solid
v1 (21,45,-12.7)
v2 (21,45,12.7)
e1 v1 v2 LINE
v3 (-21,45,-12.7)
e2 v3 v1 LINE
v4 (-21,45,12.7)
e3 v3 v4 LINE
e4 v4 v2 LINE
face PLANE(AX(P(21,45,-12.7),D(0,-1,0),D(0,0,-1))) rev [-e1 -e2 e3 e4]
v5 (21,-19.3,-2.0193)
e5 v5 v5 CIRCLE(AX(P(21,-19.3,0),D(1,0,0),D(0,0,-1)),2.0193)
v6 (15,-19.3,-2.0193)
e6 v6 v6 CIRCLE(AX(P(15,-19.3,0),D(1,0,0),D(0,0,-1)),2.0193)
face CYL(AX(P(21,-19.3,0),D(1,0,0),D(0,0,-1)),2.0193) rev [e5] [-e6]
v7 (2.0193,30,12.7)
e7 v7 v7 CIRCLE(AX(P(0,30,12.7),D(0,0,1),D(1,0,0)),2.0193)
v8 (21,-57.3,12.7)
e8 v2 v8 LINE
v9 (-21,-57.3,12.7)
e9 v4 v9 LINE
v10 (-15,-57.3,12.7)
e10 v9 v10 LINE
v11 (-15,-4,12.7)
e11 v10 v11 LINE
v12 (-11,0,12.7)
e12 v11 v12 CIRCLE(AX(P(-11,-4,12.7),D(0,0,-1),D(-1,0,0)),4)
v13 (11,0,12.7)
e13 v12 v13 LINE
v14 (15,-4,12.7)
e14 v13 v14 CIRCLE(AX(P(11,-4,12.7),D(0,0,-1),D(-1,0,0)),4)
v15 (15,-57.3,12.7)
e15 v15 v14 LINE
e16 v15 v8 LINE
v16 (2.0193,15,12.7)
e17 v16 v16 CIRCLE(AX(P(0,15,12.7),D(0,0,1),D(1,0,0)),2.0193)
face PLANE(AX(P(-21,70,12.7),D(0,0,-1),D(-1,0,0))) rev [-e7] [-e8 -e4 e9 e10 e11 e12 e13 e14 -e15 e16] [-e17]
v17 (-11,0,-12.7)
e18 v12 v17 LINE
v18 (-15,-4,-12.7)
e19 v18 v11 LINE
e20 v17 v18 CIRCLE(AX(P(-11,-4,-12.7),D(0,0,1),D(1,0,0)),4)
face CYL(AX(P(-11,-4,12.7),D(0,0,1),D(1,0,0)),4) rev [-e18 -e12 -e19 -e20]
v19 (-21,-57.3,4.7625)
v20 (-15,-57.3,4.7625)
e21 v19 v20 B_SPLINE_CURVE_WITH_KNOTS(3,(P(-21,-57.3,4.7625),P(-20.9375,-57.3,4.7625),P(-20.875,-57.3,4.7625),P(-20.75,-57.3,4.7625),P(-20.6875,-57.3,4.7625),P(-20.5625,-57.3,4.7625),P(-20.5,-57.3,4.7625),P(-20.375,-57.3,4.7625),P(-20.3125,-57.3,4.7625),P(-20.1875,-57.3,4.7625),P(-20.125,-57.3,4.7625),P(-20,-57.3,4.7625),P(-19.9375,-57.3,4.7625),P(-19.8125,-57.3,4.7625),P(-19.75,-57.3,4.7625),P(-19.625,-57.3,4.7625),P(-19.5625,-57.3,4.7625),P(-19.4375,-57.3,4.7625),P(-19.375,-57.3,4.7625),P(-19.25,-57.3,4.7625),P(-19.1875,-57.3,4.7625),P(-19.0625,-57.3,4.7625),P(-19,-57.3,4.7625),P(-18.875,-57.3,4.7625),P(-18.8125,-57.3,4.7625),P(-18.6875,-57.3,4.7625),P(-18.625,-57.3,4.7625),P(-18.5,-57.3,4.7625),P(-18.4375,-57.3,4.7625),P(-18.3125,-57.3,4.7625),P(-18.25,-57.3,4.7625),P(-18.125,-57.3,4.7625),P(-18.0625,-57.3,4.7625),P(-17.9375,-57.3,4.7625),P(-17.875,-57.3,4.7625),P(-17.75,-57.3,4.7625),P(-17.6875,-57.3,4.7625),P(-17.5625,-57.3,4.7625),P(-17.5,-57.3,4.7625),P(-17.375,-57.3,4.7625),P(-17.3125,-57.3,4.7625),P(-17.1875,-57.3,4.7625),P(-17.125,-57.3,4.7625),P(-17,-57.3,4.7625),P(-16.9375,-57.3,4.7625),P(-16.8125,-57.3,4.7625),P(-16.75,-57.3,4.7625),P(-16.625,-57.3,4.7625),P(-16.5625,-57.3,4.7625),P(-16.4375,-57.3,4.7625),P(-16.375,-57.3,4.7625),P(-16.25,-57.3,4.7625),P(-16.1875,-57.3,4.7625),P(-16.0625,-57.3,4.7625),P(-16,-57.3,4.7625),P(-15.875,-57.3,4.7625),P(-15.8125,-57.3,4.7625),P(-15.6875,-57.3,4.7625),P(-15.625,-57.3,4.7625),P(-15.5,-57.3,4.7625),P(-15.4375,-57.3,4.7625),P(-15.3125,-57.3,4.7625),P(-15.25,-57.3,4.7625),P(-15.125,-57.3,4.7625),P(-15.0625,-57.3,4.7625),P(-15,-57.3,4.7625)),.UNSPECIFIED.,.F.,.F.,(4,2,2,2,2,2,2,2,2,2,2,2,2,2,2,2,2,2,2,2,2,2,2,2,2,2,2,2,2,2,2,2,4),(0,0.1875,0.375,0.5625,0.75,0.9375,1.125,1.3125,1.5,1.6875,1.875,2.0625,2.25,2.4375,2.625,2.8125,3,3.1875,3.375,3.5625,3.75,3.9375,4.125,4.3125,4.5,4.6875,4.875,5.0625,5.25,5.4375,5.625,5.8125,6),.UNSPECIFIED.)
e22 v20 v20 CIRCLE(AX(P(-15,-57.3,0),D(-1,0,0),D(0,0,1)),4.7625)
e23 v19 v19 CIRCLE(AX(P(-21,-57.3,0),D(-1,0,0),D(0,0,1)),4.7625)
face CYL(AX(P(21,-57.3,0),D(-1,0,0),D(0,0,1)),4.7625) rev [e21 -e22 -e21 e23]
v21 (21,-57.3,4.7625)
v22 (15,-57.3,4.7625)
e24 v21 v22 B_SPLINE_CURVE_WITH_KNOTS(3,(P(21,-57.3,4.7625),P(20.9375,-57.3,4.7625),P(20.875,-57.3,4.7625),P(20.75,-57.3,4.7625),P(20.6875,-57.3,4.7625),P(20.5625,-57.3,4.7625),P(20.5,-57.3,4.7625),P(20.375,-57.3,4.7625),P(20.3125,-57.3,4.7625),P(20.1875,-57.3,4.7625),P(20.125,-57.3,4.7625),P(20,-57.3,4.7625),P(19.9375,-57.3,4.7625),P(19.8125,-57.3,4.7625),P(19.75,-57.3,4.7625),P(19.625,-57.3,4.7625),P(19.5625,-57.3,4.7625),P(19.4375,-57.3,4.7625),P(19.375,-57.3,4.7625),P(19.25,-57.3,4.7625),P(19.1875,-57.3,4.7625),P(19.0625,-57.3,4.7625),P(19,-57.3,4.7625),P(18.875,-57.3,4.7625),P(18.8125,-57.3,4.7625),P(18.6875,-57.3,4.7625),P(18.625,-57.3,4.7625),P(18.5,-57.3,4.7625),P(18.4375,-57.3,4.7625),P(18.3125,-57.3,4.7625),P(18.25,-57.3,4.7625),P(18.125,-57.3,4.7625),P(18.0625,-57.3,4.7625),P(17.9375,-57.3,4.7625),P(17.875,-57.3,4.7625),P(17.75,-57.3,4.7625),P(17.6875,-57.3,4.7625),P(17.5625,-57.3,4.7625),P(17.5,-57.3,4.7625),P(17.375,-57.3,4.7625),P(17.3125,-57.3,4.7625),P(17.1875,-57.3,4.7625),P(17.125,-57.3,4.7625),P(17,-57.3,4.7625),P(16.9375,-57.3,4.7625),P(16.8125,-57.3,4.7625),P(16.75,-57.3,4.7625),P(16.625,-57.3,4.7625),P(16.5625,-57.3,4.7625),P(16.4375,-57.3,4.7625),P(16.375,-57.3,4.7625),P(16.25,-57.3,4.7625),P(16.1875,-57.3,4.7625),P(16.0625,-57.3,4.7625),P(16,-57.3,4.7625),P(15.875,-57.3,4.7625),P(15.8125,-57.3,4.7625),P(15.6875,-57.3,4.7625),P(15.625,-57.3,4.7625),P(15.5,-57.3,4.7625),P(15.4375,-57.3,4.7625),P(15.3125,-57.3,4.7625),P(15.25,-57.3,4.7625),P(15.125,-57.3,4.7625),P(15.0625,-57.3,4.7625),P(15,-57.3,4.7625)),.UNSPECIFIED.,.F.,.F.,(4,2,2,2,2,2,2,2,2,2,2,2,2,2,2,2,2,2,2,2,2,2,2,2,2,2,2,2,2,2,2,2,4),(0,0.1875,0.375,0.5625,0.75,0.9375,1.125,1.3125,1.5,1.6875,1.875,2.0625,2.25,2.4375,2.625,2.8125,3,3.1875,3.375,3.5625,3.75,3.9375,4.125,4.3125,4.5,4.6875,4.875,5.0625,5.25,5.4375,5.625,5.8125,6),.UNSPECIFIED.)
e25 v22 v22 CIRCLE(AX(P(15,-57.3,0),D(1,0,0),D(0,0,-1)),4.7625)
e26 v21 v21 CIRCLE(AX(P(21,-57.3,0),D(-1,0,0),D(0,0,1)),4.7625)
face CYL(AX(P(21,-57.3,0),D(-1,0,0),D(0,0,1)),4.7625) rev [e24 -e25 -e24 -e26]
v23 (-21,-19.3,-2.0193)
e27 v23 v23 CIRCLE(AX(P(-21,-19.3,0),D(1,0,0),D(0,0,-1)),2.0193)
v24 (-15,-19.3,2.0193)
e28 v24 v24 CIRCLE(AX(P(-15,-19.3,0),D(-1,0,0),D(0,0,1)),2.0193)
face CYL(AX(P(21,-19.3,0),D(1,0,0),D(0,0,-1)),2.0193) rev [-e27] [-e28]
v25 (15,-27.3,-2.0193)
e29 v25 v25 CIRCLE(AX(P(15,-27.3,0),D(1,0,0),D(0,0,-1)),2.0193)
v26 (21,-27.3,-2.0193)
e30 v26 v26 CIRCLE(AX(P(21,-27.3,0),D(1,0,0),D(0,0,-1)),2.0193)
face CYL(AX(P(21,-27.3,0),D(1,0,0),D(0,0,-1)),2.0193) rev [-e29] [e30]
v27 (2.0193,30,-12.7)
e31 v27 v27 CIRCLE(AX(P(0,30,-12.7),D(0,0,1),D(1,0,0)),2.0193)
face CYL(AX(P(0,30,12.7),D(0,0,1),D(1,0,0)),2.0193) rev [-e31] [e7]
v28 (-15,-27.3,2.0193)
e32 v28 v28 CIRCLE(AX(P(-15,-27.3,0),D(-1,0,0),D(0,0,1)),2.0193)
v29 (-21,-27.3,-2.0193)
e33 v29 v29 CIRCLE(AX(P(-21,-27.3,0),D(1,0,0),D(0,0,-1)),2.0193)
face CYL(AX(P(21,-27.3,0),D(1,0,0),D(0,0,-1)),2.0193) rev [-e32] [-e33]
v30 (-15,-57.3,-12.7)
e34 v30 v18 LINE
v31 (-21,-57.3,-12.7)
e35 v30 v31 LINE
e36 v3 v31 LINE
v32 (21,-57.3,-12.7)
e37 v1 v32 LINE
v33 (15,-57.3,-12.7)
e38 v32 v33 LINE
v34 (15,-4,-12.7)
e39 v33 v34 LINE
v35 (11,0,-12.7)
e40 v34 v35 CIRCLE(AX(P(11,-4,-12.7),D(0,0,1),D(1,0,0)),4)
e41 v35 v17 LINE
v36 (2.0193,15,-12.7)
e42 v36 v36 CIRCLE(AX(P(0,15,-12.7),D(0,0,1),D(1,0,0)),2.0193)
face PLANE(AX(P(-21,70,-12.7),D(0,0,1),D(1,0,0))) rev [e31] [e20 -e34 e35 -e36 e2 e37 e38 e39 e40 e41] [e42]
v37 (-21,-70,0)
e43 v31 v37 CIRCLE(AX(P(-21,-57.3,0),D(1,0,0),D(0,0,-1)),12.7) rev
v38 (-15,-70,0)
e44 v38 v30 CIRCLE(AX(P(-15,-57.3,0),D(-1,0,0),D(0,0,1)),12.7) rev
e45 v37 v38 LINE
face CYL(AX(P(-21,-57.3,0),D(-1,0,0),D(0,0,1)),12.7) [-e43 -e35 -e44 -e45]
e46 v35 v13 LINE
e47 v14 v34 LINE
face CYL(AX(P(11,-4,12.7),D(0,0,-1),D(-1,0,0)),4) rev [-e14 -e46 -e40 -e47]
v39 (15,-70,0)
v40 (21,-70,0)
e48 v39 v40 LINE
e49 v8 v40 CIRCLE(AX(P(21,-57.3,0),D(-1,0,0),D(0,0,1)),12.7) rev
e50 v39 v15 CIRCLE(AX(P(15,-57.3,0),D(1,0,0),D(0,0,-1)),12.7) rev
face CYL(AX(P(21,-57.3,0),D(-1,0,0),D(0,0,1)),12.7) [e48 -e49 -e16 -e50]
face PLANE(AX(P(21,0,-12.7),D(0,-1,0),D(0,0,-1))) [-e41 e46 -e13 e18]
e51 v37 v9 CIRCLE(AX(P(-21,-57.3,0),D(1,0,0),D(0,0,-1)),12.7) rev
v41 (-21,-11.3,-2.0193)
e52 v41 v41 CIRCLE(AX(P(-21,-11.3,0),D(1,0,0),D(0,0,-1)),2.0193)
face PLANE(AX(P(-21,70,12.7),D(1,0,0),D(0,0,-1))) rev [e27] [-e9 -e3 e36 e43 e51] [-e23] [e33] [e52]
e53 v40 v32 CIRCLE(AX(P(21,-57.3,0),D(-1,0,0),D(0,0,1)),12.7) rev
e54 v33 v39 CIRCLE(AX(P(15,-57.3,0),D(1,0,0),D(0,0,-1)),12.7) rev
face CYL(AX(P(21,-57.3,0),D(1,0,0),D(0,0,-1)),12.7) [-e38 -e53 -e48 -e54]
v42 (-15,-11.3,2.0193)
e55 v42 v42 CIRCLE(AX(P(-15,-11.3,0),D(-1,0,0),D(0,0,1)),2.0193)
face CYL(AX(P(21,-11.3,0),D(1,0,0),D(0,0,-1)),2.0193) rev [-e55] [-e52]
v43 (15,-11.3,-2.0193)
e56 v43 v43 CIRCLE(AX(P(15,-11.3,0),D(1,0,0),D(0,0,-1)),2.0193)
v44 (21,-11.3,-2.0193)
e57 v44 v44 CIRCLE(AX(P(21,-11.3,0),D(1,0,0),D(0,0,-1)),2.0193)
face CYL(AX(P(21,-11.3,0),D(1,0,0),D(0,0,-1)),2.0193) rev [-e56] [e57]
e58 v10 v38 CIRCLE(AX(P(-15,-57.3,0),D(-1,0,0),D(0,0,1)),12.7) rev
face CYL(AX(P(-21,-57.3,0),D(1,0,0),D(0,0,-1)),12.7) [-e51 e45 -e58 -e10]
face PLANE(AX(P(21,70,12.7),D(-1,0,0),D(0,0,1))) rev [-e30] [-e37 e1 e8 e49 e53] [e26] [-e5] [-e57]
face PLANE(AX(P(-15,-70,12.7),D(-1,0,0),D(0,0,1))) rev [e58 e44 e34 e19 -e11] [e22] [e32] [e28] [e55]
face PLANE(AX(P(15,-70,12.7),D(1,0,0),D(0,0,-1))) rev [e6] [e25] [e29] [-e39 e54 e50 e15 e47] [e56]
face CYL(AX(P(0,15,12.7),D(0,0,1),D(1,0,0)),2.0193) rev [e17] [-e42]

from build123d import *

# Parameters (mm, degrees)
SKETCH_1_W            = 42
SKETCH_1_H            = 25.4
EXTRUDE_1_DEPTH       = 70
SKETCH_5_W            = 6
SKETCH_5_H            = 25.4
EXTRUDE_5_DEPTH       = 70
SKETCH_6_R            = 4.7625
CUT_EXTRUDE_2_DEPTH   = 83.61531335
FILLET_6_R            = 4
HOLE_WIZARD_10_32_1_D = 4.0386
FILLET_7_R            = 12.7
SKETCH_9_W            = 42
SKETCH_9_H            = 25
CUT_EXTRUDE_3_DEPTH   = 78.370278531
HOLE_WIZARD_10_32_2_D = 4.0386


with BuildPart() as part:
    # 草圖1 → 填料-伸長1 (new body)
    with BuildSketch(Plane(origin=(0, 0, 0), x_dir=(1, 0, 0), z_dir=(0, 1, 0))):
        Rectangle(SKETCH_1_W, SKETCH_1_H)
    extrude(amount=EXTRUDE_1_DEPTH)

    # 草圖5 → 填料-伸長5 (add)
    with BuildSketch(Plane.XZ):
        with Locations((-18, 0)):
            Rectangle(SKETCH_5_W, SKETCH_5_H)
        with Locations((18, 0)):
            Rectangle(SKETCH_5_W, SKETCH_5_H)
    extrude(amount=EXTRUDE_5_DEPTH)

    # 草圖6 → 除料-伸長2 (cut, through all)
    with BuildSketch(Plane.ZY.offset(21)):
        with Locations((0, -57.3)):
            Circle(SKETCH_6_R)
    extrude(amount=-CUT_EXTRUDE_2_DEPTH, mode=Mode.SUBTRACT)

    # 圓角6
    fillet_6_edges = [part.edges().sort_by_distance(p)[0] for p in [
        (15, 0, 0),
        (-15, 0, 0),
    ]]
    fillet(fillet_6_edges, radius=FILLET_6_R)

    # #10-32 螺紋孔1 (through all)
    with Locations(Plane.XY.offset(12.7)):
        with Locations((0, 30), (0, 15)):
            Hole(HOLE_WIZARD_10_32_1_D / 2)

    # 圓角7
    fillet_7_edges = [part.edges().sort_by_distance(p)[0] for p in [
        (18, -70, 12.7),
        (18, -70, -12.7),
        (-18, -70, 12.7),
        (-18, -70, -12.7),
    ]]
    fillet(fillet_7_edges, radius=FILLET_7_R - 0.0001)  # a hair under: the kernel refuses the full size

    # 草圖9 → 除料-伸長3 (cut, through all)
    with BuildSketch(Plane.XY.offset(12.7)):
        with Locations((0, 57.5)):
            Rectangle(SKETCH_9_W, SKETCH_9_H)
    extrude(amount=-CUT_EXTRUDE_3_DEPTH, mode=Mode.SUBTRACT)

    # #10-32 螺紋孔2 (through all)
    with Locations(Plane(origin=(21, 0, 0), x_dir=(0, 0, -1), z_dir=(1, 0, 0))):
        with Locations((0, -11.3), (0, -19.3), (0, -27.3)):
            Hole(HOLE_WIZARD_10_32_2_D / 2)


solid = part.part
